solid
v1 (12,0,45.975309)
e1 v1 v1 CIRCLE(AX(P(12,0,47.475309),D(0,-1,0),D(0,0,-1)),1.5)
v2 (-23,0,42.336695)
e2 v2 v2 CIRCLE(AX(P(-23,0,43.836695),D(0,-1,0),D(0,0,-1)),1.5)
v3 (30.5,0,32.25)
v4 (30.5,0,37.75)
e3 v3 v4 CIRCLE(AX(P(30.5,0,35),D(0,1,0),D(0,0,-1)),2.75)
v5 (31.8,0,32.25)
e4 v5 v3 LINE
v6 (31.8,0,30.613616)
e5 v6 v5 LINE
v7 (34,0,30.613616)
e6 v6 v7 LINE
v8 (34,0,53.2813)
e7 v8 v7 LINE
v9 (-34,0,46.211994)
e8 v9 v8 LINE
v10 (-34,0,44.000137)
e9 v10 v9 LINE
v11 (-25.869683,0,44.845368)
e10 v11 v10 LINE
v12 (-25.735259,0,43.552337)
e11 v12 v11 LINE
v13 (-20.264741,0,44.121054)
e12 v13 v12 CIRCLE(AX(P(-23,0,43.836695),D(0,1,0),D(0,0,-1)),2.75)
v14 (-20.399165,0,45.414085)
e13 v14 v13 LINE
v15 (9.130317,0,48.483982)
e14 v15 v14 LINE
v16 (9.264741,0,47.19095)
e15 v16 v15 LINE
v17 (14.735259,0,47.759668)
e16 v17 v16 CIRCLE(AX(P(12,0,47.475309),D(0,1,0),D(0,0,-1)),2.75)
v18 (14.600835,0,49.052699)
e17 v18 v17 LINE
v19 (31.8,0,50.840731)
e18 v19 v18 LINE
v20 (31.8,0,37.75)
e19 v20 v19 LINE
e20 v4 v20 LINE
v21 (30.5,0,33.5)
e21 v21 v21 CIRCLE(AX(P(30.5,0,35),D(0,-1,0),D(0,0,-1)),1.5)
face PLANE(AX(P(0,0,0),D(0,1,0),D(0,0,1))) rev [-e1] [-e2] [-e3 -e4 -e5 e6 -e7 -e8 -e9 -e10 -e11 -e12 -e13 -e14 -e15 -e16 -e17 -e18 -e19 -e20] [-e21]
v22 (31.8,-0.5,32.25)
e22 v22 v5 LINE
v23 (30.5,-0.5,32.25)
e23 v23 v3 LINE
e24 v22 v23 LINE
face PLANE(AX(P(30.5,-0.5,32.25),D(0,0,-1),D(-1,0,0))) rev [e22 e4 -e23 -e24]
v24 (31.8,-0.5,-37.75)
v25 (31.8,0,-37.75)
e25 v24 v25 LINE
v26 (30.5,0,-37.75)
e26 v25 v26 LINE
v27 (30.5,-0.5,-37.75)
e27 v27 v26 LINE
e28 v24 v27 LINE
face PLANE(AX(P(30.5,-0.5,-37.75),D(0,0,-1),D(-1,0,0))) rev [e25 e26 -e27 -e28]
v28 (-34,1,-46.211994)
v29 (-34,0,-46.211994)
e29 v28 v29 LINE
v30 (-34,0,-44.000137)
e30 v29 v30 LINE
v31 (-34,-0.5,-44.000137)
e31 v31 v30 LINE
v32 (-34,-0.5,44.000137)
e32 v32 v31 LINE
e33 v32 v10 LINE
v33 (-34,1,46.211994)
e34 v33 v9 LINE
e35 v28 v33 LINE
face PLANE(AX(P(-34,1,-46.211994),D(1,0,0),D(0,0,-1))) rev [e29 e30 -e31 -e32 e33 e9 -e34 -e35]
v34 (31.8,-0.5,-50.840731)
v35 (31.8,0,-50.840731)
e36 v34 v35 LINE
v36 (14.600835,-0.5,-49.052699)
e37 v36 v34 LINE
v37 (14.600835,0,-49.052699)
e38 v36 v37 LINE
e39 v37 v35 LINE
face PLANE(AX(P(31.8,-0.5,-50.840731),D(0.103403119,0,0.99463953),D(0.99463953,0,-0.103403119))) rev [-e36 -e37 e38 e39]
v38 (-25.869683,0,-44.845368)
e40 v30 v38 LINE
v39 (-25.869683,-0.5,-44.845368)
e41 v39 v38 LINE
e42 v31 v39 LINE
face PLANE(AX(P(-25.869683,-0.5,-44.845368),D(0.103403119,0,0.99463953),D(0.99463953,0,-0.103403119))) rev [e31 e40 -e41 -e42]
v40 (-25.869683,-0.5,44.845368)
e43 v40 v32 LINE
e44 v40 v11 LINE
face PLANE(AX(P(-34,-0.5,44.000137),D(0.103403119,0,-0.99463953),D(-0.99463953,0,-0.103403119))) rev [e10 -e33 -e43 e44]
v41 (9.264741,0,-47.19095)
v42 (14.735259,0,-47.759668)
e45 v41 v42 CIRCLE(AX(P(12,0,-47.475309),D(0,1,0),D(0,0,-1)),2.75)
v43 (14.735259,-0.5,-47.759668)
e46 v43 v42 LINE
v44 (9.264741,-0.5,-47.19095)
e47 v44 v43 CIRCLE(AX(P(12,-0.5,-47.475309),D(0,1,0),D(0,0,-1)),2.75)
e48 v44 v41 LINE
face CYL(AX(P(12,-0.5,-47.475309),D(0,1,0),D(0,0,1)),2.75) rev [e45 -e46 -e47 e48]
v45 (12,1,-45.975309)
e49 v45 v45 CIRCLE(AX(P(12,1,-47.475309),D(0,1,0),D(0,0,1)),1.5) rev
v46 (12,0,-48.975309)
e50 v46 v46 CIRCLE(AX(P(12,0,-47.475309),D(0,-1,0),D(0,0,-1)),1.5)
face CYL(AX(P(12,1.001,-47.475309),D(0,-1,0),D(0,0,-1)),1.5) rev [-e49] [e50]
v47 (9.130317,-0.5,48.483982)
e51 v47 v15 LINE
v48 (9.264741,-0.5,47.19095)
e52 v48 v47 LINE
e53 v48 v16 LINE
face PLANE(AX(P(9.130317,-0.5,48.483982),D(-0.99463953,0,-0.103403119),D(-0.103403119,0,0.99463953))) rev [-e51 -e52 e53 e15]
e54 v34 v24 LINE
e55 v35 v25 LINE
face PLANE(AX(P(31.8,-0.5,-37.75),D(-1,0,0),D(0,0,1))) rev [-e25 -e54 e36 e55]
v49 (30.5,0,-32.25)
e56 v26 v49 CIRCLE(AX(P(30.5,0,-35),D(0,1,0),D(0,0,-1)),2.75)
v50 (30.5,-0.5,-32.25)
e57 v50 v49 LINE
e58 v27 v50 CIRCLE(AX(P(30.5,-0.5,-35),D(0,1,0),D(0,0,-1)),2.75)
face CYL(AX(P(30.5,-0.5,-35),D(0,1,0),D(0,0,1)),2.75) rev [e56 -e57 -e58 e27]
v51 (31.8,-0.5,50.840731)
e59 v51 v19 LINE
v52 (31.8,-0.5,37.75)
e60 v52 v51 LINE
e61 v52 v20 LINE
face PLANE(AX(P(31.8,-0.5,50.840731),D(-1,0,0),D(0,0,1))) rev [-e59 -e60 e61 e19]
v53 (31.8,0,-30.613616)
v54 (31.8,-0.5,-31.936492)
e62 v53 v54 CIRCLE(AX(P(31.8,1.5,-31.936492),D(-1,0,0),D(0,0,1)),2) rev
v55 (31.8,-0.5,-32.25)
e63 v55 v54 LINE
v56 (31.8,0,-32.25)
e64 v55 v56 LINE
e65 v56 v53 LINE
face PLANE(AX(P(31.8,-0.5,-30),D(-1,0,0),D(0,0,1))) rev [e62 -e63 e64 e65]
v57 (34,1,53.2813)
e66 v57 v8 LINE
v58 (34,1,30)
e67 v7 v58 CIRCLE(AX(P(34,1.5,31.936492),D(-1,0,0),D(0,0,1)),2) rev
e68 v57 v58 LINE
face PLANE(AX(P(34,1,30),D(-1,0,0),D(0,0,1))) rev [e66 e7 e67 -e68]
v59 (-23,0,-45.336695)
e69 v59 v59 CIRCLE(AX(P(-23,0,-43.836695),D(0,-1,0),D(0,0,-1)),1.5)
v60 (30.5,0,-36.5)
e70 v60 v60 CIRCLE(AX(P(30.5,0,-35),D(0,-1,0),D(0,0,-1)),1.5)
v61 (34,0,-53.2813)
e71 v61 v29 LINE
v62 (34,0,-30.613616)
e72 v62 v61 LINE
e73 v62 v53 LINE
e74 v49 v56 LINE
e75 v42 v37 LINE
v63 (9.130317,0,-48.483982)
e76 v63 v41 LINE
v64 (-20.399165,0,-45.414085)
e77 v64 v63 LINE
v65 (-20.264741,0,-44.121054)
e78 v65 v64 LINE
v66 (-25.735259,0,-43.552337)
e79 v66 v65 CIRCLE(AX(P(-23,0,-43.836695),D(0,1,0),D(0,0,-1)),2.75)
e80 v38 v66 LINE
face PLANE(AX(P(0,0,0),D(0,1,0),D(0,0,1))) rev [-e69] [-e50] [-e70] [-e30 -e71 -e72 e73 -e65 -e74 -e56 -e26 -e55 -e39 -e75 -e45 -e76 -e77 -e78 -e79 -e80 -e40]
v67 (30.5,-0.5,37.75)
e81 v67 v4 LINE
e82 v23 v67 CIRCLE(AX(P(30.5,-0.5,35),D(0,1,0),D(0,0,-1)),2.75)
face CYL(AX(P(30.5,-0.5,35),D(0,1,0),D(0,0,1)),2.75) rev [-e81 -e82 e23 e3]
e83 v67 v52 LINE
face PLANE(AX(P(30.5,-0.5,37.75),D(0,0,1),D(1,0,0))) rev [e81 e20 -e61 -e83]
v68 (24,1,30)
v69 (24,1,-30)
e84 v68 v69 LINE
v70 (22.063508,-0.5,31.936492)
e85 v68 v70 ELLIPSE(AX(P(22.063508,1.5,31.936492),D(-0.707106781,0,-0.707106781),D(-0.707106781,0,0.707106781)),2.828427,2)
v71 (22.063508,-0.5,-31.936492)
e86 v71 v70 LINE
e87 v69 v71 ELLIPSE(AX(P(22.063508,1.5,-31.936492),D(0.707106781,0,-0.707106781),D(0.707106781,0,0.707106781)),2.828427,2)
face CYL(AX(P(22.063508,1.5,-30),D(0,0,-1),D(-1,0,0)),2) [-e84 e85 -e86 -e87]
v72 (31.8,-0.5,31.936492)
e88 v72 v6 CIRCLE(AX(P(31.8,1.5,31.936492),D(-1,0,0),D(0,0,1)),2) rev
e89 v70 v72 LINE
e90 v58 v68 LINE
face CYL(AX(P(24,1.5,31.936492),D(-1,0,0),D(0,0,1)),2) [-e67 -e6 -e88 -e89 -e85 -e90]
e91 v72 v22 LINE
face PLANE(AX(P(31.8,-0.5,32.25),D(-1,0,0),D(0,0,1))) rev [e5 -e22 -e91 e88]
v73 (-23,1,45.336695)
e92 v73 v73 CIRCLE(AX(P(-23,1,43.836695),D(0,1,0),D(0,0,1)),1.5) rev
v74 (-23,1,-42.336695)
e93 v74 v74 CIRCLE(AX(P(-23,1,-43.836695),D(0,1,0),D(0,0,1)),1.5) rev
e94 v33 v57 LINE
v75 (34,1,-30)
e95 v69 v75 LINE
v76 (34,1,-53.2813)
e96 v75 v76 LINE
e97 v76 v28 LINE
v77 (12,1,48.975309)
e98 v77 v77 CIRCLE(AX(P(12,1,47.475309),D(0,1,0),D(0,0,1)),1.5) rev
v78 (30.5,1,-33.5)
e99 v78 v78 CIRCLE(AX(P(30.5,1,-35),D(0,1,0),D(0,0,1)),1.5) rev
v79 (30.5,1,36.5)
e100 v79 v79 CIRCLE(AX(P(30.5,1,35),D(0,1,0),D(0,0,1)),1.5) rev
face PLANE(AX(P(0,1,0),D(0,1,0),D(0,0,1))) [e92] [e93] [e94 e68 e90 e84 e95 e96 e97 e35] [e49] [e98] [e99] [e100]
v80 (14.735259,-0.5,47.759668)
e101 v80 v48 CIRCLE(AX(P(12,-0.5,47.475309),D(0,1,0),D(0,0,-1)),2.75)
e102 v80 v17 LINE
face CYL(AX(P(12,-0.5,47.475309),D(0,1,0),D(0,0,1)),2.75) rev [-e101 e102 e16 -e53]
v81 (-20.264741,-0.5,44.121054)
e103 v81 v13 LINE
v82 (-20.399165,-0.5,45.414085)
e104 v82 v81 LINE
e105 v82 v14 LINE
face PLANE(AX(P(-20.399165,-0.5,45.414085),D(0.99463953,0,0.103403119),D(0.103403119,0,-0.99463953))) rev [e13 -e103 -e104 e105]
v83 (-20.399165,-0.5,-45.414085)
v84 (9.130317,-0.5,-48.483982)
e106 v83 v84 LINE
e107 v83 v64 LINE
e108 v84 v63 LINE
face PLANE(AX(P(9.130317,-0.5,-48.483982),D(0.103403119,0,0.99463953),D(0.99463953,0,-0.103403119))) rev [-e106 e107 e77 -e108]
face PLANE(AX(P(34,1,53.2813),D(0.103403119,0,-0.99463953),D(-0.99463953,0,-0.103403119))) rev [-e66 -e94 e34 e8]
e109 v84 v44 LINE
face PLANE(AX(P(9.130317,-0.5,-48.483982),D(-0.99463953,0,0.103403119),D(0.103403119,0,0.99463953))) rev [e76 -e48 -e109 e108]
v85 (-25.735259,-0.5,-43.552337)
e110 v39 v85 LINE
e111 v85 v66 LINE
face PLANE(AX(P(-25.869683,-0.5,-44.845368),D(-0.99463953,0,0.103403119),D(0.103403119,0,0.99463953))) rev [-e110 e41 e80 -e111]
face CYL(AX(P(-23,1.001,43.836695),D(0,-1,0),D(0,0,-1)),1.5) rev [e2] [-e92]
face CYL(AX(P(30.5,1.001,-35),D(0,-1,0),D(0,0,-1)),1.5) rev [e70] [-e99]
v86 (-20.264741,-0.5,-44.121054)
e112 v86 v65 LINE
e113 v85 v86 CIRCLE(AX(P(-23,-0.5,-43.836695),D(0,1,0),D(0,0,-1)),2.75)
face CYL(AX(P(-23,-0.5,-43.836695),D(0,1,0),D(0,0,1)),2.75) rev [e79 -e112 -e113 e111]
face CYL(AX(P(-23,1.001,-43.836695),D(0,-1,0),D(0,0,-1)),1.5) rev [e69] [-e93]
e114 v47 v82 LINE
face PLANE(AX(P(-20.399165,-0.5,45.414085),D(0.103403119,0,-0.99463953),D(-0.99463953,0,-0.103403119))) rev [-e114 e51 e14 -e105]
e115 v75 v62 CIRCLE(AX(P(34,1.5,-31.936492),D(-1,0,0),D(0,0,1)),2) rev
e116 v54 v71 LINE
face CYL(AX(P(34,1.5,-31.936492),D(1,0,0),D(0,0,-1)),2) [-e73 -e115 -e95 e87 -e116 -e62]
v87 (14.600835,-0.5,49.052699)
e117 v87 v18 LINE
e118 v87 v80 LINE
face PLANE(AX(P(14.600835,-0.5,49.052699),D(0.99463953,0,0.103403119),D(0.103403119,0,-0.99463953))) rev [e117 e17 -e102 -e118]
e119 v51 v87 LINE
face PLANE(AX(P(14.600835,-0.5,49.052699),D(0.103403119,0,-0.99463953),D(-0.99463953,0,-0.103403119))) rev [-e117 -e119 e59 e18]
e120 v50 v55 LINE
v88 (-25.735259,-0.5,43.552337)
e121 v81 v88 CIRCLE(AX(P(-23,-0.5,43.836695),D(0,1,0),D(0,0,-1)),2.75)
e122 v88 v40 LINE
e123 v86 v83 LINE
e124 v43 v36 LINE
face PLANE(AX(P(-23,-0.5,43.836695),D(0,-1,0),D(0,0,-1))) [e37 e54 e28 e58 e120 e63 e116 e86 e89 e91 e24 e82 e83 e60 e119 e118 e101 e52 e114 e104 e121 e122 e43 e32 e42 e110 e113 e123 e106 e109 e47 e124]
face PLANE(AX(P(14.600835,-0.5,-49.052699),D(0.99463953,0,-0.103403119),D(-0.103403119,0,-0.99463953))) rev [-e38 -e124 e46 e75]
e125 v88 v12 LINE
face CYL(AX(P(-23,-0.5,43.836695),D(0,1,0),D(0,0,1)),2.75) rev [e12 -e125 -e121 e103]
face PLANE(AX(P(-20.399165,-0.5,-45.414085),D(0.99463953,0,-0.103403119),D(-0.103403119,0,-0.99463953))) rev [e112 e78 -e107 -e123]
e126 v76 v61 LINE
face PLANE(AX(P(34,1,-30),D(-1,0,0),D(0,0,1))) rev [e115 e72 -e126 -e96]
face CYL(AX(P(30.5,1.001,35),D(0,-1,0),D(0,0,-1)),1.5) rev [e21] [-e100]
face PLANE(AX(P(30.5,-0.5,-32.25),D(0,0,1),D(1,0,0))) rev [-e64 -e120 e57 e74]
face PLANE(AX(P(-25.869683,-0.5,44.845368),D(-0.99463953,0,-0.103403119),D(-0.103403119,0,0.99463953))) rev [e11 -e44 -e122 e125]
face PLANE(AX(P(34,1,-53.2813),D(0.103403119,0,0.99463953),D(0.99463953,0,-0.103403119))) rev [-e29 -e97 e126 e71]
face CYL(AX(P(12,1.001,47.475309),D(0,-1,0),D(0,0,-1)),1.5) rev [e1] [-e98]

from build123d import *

# Parameters (mm, degrees)
EXTRUDE_1_DEPTH     = 1
CUT_EXTRUDE_1_REACH = 65.213
SKETCH_3_R          = 1.5
EXTRUDE_2_DEPTH     = 0.5
FILLET_1_R          = 2


with BuildPart() as part:
    # 스케치2 → 보스-돌출1 (new body)
    with BuildSketch(Plane(origin=(0, 0, 0), x_dir=(1, 0, 0), z_dir=(0, 1, 0))):
        Polygon((34, 30), (34, 53.281300489), (-34, 46.211993558), (-34, -46.211993558), (34, -53.281300489), (34, -30), (24, -30), (24, 30), align=None)
    extrude(amount=EXTRUDE_1_DEPTH)

    # 스케치3 → 컷-돌출1 (cut, up to next)
    with BuildSketch(Plane.XZ, mode=Mode.PRIVATE) as cut_extrude_1_sk1:
        with Locations(Location((-23, 43.836695157, 0), (0, 0, 270))):
            Circle(SKETCH_3_R)
    cut_extrude_1_tool1 = extrude(cut_extrude_1_sk1.sketch, amount=-CUT_EXTRUDE_1_REACH, mode=Mode.PRIVATE) & part.part
    # 스케치3 → 컷-돌출1 (cut, up to next)
    with BuildSketch(Plane.XZ, mode=Mode.PRIVATE) as cut_extrude_1_sk2:
        with Locations(Location((12, 47.475309018, 0), (0, 0, 270))):
            Circle(SKETCH_3_R)
    cut_extrude_1_tool2 = extrude(cut_extrude_1_sk2.sketch, amount=-CUT_EXTRUDE_1_REACH, mode=Mode.PRIVATE) & part.part
    # 스케치3 → 컷-돌출1 (cut, up to next)
    with BuildSketch(Plane.XZ, mode=Mode.PRIVATE) as cut_extrude_1_sk3:
        with Locations(Location((30.5, 35, 0), (0, 0, 270))):
            Circle(SKETCH_3_R)
    cut_extrude_1_tool3 = extrude(cut_extrude_1_sk3.sketch, amount=-CUT_EXTRUDE_1_REACH, mode=Mode.PRIVATE) & part.part
    # 스케치3 → 컷-돌출1 (cut, up to next)
    with BuildSketch(Plane.XZ, mode=Mode.PRIVATE) as cut_extrude_1_sk4:
        with Locations(Location((30.5, -35, 0), (0, 0, 270))):
            Circle(SKETCH_3_R)
    cut_extrude_1_tool4 = extrude(cut_extrude_1_sk4.sketch, amount=-CUT_EXTRUDE_1_REACH, mode=Mode.PRIVATE) & part.part
    # 스케치3 → 컷-돌출1 (cut, up to next)
    with BuildSketch(Plane.XZ, mode=Mode.PRIVATE) as cut_extrude_1_sk5:
        with Locations(Location((-23, -43.836695157, 0), (0, 0, 270))):
            Circle(SKETCH_3_R)
    cut_extrude_1_tool5 = extrude(cut_extrude_1_sk5.sketch, amount=-CUT_EXTRUDE_1_REACH, mode=Mode.PRIVATE) & part.part
    # 스케치3 → 컷-돌출1 (cut, up to next)
    with BuildSketch(Plane.XZ, mode=Mode.PRIVATE) as cut_extrude_1_sk6:
        with Locations(Location((12, -47.475309018, 0), (0, 0, 270))):
            Circle(SKETCH_3_R)
    cut_extrude_1_tool6 = extrude(cut_extrude_1_sk6.sketch, amount=-CUT_EXTRUDE_1_REACH, mode=Mode.PRIVATE) & part.part
    add(cut_extrude_1_tool1.solids().sort_by_distance((-23, 0, 43.836695))[0], mode=Mode.SUBTRACT)
    add(cut_extrude_1_tool2.solids().sort_by_distance((12, 0, 47.475309))[0], mode=Mode.SUBTRACT)
    add(cut_extrude_1_tool3.solids().sort_by_distance((30.5, 0, 35))[0], mode=Mode.SUBTRACT)
    add(cut_extrude_1_tool4.solids().sort_by_distance((30.5, 0, -35))[0], mode=Mode.SUBTRACT)
    add(cut_extrude_1_tool5.solids().sort_by_distance((-23, 0, -43.836695))[0], mode=Mode.SUBTRACT)
    add(cut_extrude_1_tool6.solids().sort_by_distance((12, 0, -47.475309))[0], mode=Mode.SUBTRACT)

    # 스케치4 → 보스-돌출2 (add)
    with BuildSketch(Plane.XZ):
        with BuildLine():
            Line((-34, 44.000136968), (-34, -44.000136968))
            Line((-34, -44.000136968), (-25.869682763, -44.845367968))
            Line((-25.869682763, -44.845367968), (-25.735258708, -43.552336579))
            ThreePointArc((-25.735258708, -43.552336579), (-22.715641421, -41.101436449), (-20.264741292, -44.121053736))
            Line((-20.264741292, -44.121053736), (-20.399165347, -45.414085125))
            Line((-20.399165347, -45.414085125), (9.130317237, -48.483981829))
            Line((9.130317237, -48.483981829), (9.264741292, -47.19095044))
            ThreePointArc((9.264741292, -47.19095044), (12.284358579, -44.740050311), (14.735258708, -47.759667597))
            Line((14.735258708, -47.759667597), (14.600834653, -49.052698986))
            Line((14.600834653, -49.052698986), (31.8, -50.840731027))
            Line((31.8, -50.840731027), (31.8, -37.75))
            Line((31.8, -37.75), (30.5, -37.75))
            ThreePointArc((30.5, -37.75), (27.75, -35), (30.5, -32.25))
            Line((30.5, -32.25), (31.8, -32.25))
            Line((31.8, -32.25), (31.8, -30))
            Line((31.8, -30), (24, -30))
            Line((24, -30), (24, 30))
            Line((24, 30), (31.8, 30))
            Line((31.8, 30), (31.8, 32.25))
            Line((31.8, 32.25), (30.5, 32.25))
            ThreePointArc((30.5, 32.25), (27.75, 35), (30.5, 37.75))
            Line((30.5, 37.75), (31.8, 37.75))
            Line((31.8, 37.75), (31.8, 50.840731027))
            Line((31.8, 50.840731027), (14.600834653, 49.052698986))
            Line((14.600834653, 49.052698986), (14.735258708, 47.759667597))
            ThreePointArc((14.735258708, 47.759667597), (12.284358579, 44.740050311), (9.264741292, 47.19095044))
            Line((9.264741292, 47.19095044), (9.130317237, 48.483981829))
            Line((9.130317237, 48.483981829), (-20.399165347, 45.414085125))
            Line((-20.399165347, 45.414085125), (-20.264741292, 44.121053736))
            ThreePointArc((-20.264741292, 44.121053736), (-22.715641421, 41.101436449), (-25.735258708, 43.552336579))
            Line((-25.735258708, 43.552336579), (-25.869682763, 44.845367968))
            Line((-25.869682763, 44.845367968), (-34, 44.000136968))
        make_face()
    extrude(amount=EXTRUDE_2_DEPTH)

    # 필렛1
    # the kernel refuses this fillet: 2 mm, written as the material it takes off along each edge
    with BuildSketch(Plane(origin=(36.641229183, -0.5, -30), x_dir=(0, 0, -1), z_dir=(-1, 0, 0)), Plane(origin=(24, -0.5, 30), x_dir=(0, 0, 1), z_dir=(1, 0, 0))) as fillet_1_piece_1:
        with BuildLine():
            CenterArc((1.936491673, -2), FILLET_1_R, 90, 75.522487814)
            Line((0, -1.5), (-0.038729833, -1.49))
            ThreePointArc((-0.038729833, -1.49), (-0.04, -0.75), (-0.04, 0))
            Line((-0.04, 0), (0, 0.04))
            Line((0, 0.04), (1.936491673, 0.04))
            Line((1.936491673, 0.04), (1.936491673, 0))
        make_face()
    extrude(amount=12.641229183, mode=Mode.SUBTRACT)
    with BuildSketch(Plane(origin=(24, -0.5, -30), x_dir=(-1, 0, 0), z_dir=(0, 0, 1))) as fillet_1_piece_2:
        with BuildLine():
            CenterArc((1.936491673, -2), FILLET_1_R, 90, 75.522487814)
            Line((0, -1.5), (-0.038729833, -1.49))
            ThreePointArc((-0.038729833, -1.49), (-0.04, -0.75), (-0.04, 0))
            Line((-0.04, 0), (0, 0.04))
            Line((0, 0.04), (1.936491673, 0.04))
            Line((1.936491673, 0.04), (1.936491673, 0))
        make_face()
    extrude(amount=60, mode=Mode.SUBTRACT)
    with BuildSketch(Plane(origin=(36.641229183, -0.5, -30), x_dir=(0, 0, -1), z_dir=(-1, 0, 0))) as fillet_1_piece_3a_section:
        with BuildLine():
            CenterArc((1.936491673, -2), FILLET_1_R, 90, 75.522487814)
            Line((0, -1.5), (-0.038729833, -1.49))
            ThreePointArc((-0.038729833, -1.49), (-0.04, -0.75), (-0.04, 0))
            Line((-0.04, 0), (0, 0.04))
            Line((0, 0.04), (1.936491673, 0.04))
            Line((1.936491673, 0.04), (1.936491673, 0))
        make_face()
    fillet_1_piece_3a = extrude(amount=17.482458366, mode=Mode.PRIVATE)
    fillet_1_piece_3a = split(fillet_1_piece_3a, bisect_by=Plane(origin=(24, -0.120816489, -30.456288202), z_dir=(-1, 0, 0)), keep=Keep.TOP, mode=Mode.PRIVATE)
    with BuildSketch(Plane(origin=(24, -0.5, -34.841229183), x_dir=(-1, 0, 0), z_dir=(0, 0, 1))) as fillet_1_piece_3b_section:
        with BuildLine():
            CenterArc((1.936491673, -2), FILLET_1_R, 90, 75.522487814)
            Line((0, -1.5), (-0.038729833, -1.49))
            ThreePointArc((-0.038729833, -1.49), (-0.04, -0.75), (-0.04, 0))
            Line((-0.04, 0), (0, 0.04))
            Line((0, 0.04), (1.936491673, 0.04))
            Line((1.936491673, 0.04), (1.936491673, 0))
        make_face()
    fillet_1_piece_3b = extrude(amount=64.841229183, mode=Mode.PRIVATE)
    fillet_1_piece_3b = split(fillet_1_piece_3b, bisect_by=Plane(origin=(23.543711798, -0.120816489, -30), z_dir=(0, 0, -1)), keep=Keep.TOP, mode=Mode.PRIVATE)
    fillet_1_piece_3 = fillet_1_piece_3a & fillet_1_piece_3b
    add(fillet_1_piece_3, mode=Mode.SUBTRACT)
    with BuildSketch(Plane(origin=(24, -0.5, -30), x_dir=(-1, 0, 0), z_dir=(0, 0, 1))) as fillet_1_piece_4a_section:
        with BuildLine():
            CenterArc((1.936491673, -2), FILLET_1_R, 90, 75.522487814)
            Line((0, -1.5), (-0.038729833, -1.49))
            ThreePointArc((-0.038729833, -1.49), (-0.04, -0.75), (-0.04, 0))
            Line((-0.04, 0), (0, 0.04))
            Line((0, 0.04), (1.936491673, 0.04))
            Line((1.936491673, 0.04), (1.936491673, 0))
        make_face()
    fillet_1_piece_4a = extrude(amount=64.841229183, mode=Mode.PRIVATE)
    fillet_1_piece_4a = split(fillet_1_piece_4a, bisect_by=Plane(origin=(23.543711798, -0.120816489, 30), z_dir=(0, 0, 1)), keep=Keep.TOP, mode=Mode.PRIVATE)
    with BuildSketch(Plane(origin=(19.158770817, -0.5, 30), x_dir=(0, 0, 1), z_dir=(1, 0, 0))) as fillet_1_piece_4b_section:
        with BuildLine():
            CenterArc((1.936491673, -2), FILLET_1_R, 90, 75.522487814)
            Line((0, -1.5), (-0.038729833, -1.49))
            ThreePointArc((-0.038729833, -1.49), (-0.04, -0.75), (-0.04, 0))
            Line((-0.04, 0), (0, 0.04))
            Line((0, 0.04), (1.936491673, 0.04))
            Line((1.936491673, 0.04), (1.936491673, 0))
        make_face()
    fillet_1_piece_4b = extrude(amount=17.482458366, mode=Mode.PRIVATE)
    fillet_1_piece_4b = split(fillet_1_piece_4b, bisect_by=Plane(origin=(24, -0.120816489, 30.456288202), z_dir=(-1, 0, 0)), keep=Keep.TOP, mode=Mode.PRIVATE)
    fillet_1_piece_4 = fillet_1_piece_4a & fillet_1_piece_4b
    add(fillet_1_piece_4, mode=Mode.SUBTRACT)


solid = part.part
